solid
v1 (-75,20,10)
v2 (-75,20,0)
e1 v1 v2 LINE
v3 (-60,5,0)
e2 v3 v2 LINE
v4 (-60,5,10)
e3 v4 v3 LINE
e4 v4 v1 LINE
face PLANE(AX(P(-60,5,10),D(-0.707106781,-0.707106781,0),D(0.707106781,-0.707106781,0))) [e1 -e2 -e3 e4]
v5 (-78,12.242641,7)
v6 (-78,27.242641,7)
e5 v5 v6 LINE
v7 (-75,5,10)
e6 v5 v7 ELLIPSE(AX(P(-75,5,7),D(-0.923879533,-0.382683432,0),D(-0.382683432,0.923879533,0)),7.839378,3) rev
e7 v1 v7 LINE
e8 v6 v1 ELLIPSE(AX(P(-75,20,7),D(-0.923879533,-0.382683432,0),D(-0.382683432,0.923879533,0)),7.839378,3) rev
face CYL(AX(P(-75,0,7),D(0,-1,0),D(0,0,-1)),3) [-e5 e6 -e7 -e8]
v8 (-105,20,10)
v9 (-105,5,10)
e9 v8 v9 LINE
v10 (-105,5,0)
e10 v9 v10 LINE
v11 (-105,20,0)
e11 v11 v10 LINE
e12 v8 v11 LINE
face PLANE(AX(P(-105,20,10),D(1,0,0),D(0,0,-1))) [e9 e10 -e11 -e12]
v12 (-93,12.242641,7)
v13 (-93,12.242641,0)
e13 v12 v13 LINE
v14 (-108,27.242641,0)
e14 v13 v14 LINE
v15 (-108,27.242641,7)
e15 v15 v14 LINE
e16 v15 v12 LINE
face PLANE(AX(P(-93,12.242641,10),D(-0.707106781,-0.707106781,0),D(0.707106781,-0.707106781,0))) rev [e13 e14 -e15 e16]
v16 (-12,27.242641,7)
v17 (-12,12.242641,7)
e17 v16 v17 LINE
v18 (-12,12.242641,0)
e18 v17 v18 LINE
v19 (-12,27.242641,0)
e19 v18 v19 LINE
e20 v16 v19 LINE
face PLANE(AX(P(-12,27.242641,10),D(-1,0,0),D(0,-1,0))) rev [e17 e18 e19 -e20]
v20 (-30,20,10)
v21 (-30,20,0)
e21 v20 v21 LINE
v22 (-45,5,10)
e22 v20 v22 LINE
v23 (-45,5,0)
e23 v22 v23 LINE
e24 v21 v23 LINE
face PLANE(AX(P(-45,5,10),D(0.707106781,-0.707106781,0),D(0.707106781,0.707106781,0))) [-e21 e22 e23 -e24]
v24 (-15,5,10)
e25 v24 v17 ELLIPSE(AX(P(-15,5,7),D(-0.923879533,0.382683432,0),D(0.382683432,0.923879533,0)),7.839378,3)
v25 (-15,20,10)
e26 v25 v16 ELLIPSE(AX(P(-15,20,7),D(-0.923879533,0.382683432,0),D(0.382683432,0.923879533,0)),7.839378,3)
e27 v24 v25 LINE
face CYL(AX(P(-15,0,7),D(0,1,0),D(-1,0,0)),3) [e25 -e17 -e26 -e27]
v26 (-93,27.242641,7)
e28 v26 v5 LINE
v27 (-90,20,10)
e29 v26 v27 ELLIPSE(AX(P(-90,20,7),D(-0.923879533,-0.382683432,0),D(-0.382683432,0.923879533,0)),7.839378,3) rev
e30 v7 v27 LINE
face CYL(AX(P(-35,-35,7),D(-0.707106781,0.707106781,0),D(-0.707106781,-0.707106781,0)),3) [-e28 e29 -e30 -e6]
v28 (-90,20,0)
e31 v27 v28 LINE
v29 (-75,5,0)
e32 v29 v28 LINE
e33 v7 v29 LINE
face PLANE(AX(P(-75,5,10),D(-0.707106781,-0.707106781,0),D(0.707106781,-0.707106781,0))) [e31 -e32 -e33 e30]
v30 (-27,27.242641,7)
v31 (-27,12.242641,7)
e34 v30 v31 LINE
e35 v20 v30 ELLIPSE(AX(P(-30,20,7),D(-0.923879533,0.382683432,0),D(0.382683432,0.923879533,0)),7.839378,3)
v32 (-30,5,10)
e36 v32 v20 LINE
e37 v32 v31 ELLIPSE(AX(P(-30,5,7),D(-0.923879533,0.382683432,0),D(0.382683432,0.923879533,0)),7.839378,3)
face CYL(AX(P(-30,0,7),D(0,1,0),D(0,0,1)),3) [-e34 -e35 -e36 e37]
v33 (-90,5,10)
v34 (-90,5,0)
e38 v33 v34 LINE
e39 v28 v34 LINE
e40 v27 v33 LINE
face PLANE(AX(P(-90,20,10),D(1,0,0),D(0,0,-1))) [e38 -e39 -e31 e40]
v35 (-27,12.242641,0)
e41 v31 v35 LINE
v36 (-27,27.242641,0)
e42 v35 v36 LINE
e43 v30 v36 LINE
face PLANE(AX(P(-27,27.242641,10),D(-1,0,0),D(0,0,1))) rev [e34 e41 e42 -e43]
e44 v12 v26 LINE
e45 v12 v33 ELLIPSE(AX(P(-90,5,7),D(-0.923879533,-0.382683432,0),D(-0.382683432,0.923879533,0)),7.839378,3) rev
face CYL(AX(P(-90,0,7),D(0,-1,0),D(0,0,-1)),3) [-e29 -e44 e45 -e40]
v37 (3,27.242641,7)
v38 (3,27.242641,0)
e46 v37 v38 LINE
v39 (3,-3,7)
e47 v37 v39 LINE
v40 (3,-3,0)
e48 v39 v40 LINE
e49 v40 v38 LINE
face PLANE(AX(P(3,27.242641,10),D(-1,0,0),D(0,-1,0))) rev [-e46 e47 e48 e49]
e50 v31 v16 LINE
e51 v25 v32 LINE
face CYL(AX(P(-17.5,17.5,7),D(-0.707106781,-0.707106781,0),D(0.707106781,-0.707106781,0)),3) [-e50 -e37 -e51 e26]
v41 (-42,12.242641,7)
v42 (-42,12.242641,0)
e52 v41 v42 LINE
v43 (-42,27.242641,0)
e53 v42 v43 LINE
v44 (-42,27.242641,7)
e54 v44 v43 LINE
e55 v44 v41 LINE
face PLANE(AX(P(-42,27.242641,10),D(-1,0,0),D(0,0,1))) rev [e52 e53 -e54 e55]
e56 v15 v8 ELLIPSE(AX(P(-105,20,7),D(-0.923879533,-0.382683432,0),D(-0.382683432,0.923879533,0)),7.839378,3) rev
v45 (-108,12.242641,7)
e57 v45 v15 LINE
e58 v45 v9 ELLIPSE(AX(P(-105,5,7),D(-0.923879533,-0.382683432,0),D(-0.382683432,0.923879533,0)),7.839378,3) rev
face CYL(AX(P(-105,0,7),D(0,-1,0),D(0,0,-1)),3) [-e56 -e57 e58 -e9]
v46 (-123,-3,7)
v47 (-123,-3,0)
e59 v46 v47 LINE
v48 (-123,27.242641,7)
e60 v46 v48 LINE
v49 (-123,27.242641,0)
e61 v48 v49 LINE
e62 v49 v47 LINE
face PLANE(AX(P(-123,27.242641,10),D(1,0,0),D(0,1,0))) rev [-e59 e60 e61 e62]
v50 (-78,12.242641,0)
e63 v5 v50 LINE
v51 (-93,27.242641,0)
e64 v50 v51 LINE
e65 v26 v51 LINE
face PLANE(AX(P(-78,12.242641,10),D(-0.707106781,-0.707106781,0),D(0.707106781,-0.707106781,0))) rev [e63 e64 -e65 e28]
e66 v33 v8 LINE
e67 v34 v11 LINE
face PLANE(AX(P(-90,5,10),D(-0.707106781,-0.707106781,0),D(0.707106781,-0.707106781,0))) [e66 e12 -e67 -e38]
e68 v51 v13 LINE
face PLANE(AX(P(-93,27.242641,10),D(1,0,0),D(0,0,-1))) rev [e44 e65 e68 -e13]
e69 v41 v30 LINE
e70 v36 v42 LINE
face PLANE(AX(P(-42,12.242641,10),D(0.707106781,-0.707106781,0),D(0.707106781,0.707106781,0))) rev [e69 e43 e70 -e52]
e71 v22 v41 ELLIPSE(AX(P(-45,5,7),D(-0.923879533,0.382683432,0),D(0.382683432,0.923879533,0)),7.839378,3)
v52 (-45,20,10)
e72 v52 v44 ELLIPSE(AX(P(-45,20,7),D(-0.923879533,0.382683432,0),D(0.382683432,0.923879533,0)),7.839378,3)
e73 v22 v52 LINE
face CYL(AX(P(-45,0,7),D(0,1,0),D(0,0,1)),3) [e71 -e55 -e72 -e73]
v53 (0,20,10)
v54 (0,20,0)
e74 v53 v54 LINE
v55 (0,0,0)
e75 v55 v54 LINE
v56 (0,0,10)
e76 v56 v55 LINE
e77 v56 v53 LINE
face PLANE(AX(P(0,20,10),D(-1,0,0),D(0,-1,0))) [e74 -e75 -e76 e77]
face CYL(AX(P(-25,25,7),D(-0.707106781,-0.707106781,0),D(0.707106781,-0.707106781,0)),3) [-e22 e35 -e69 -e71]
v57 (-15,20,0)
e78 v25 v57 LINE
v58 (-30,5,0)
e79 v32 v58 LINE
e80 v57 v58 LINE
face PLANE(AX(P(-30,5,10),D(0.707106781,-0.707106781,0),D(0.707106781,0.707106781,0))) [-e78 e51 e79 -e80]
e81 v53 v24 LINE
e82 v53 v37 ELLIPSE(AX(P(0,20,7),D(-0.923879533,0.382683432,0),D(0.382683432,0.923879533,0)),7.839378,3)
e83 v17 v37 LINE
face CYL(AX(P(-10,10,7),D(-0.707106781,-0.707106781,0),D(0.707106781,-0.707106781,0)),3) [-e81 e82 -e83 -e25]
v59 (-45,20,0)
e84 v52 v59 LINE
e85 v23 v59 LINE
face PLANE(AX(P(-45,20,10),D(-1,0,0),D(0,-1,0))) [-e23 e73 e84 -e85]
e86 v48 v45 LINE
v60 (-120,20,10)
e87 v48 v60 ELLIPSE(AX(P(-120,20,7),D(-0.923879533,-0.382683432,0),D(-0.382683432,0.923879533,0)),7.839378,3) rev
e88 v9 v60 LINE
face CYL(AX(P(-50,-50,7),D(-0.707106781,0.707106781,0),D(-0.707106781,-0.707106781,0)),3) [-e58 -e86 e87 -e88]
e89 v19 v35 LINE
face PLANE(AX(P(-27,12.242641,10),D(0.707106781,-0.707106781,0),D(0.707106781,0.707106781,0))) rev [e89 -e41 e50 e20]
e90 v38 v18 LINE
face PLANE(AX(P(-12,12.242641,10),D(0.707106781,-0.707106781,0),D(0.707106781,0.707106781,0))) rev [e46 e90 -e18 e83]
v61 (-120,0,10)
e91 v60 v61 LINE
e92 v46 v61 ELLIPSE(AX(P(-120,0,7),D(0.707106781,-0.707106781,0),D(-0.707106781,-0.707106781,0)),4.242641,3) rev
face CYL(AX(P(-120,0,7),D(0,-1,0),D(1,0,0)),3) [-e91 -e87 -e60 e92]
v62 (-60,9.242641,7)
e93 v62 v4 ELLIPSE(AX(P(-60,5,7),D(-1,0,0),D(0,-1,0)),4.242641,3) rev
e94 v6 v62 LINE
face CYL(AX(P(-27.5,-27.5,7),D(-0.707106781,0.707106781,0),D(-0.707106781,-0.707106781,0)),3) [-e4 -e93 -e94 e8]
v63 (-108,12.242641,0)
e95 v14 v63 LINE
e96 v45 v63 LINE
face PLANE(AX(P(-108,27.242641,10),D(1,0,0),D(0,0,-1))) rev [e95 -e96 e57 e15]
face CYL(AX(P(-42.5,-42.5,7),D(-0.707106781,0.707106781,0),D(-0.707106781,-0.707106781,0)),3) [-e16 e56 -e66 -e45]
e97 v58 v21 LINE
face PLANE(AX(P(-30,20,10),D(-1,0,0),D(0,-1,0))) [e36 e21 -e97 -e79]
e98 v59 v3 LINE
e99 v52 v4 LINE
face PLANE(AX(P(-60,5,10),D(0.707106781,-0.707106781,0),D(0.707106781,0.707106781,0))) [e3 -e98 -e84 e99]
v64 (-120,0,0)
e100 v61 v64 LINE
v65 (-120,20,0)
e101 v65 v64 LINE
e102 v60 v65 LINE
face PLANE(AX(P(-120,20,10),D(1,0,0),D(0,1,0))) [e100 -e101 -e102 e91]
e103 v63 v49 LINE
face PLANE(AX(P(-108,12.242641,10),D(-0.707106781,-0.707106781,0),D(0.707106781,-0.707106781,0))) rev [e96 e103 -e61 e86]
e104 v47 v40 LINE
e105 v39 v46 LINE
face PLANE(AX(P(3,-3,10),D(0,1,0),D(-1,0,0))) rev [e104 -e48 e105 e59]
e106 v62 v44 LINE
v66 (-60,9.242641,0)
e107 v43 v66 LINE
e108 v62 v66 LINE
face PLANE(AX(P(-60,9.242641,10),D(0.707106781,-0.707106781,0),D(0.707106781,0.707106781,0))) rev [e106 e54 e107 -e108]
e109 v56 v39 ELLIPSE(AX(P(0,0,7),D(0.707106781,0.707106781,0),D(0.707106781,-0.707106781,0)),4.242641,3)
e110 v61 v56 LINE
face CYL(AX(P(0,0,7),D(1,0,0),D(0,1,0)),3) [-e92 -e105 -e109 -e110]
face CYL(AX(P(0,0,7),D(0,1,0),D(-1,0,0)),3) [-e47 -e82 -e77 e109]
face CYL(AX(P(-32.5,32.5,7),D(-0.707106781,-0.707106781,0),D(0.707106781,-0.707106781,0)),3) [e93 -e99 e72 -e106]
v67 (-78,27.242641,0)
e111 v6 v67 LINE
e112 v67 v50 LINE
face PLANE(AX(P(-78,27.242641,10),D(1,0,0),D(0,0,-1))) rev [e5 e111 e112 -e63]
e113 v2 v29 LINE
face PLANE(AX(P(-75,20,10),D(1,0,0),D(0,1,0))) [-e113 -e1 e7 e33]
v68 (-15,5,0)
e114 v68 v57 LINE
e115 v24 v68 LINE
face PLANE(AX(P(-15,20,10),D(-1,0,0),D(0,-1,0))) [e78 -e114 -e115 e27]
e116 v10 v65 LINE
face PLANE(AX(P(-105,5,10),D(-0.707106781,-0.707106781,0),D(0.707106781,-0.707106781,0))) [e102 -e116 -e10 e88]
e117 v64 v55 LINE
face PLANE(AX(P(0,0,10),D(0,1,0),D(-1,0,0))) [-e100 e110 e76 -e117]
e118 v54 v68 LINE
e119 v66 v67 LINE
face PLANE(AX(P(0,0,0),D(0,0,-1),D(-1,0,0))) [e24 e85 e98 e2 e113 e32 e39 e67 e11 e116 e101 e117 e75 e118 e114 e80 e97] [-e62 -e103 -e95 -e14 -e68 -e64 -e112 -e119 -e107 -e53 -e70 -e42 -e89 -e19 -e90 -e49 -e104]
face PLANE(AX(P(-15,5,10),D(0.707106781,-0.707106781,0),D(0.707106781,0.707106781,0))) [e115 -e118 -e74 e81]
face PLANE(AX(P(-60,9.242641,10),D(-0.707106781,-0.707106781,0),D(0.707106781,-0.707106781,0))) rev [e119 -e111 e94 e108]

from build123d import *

# Parameters (mm, degrees)
BOSS_EXTRUDE1_DEPTH = 10
FILLET11_R          = 3


with BuildPart() as part:
    # Sketch2 → Boss-Extrude1 (new body)
    with BuildSketch(Plane.XY):
        Polygon((-60, 9.242640687), (-42, 27.242640687), (-42, 12.242640687), (-27, 27.242640687), (-27, 12.242640687), (-12, 27.242640687), (-12, 12.242640687), (3, 27.242640687), (3, -3), (-123, -3), (-123, 27.242640687), (-108, 12.242640687), (-108, 27.242640687), (-93, 12.242640687), (-93, 27.242640687), (-78, 12.242640687), (-78, 27.242640687), align=None)
        Polygon((-60, 5), (-45, 20), (-45, 5), (-30, 20), (-30, 5), (-15, 20), (-15, 5), (0, 20), (0, 0), (-120, 0), (-120, 20), (-105, 5), (-105, 20), (-90, 5), (-90, 20), (-75, 5), (-75, 20), align=None, mode=Mode.SUBTRACT)
    extrude(amount=BOSS_EXTRUDE1_DEPTH)

    # Fillet11
    fillet11_edges = [part.edges().sort_by_distance(p)[0] for p in [
        (-85.5, 19.742640687, 10),
        (-93, 19.742640687, 10),
        (-100.5, 19.742640687, 10),
        (-108, 19.742640687, 10),
        (-115.5, 19.742640687, 10),
        (-123, 12.121320344, 10),
        (-60, -3, 10),
        (3, 12.121320344, 10),
        (-4.5, 19.742640687, 10),
        (-12, 19.742640687, 10),
        (-69, 18.242640687, 10),
        (-19.5, 19.742640687, 10),
        (-27, 19.742640687, 10),
        (-34.5, 19.742640687, 10),
        (-42, 19.742640687, 10),
        (-51, 18.242640687, 10),
        (-78, 19.742640687, 10),
    ]]
    fillet(fillet11_edges, radius=FILLET11_R - 0.0001)  # a hair under: the kernel refuses the full size


solid = part.part
